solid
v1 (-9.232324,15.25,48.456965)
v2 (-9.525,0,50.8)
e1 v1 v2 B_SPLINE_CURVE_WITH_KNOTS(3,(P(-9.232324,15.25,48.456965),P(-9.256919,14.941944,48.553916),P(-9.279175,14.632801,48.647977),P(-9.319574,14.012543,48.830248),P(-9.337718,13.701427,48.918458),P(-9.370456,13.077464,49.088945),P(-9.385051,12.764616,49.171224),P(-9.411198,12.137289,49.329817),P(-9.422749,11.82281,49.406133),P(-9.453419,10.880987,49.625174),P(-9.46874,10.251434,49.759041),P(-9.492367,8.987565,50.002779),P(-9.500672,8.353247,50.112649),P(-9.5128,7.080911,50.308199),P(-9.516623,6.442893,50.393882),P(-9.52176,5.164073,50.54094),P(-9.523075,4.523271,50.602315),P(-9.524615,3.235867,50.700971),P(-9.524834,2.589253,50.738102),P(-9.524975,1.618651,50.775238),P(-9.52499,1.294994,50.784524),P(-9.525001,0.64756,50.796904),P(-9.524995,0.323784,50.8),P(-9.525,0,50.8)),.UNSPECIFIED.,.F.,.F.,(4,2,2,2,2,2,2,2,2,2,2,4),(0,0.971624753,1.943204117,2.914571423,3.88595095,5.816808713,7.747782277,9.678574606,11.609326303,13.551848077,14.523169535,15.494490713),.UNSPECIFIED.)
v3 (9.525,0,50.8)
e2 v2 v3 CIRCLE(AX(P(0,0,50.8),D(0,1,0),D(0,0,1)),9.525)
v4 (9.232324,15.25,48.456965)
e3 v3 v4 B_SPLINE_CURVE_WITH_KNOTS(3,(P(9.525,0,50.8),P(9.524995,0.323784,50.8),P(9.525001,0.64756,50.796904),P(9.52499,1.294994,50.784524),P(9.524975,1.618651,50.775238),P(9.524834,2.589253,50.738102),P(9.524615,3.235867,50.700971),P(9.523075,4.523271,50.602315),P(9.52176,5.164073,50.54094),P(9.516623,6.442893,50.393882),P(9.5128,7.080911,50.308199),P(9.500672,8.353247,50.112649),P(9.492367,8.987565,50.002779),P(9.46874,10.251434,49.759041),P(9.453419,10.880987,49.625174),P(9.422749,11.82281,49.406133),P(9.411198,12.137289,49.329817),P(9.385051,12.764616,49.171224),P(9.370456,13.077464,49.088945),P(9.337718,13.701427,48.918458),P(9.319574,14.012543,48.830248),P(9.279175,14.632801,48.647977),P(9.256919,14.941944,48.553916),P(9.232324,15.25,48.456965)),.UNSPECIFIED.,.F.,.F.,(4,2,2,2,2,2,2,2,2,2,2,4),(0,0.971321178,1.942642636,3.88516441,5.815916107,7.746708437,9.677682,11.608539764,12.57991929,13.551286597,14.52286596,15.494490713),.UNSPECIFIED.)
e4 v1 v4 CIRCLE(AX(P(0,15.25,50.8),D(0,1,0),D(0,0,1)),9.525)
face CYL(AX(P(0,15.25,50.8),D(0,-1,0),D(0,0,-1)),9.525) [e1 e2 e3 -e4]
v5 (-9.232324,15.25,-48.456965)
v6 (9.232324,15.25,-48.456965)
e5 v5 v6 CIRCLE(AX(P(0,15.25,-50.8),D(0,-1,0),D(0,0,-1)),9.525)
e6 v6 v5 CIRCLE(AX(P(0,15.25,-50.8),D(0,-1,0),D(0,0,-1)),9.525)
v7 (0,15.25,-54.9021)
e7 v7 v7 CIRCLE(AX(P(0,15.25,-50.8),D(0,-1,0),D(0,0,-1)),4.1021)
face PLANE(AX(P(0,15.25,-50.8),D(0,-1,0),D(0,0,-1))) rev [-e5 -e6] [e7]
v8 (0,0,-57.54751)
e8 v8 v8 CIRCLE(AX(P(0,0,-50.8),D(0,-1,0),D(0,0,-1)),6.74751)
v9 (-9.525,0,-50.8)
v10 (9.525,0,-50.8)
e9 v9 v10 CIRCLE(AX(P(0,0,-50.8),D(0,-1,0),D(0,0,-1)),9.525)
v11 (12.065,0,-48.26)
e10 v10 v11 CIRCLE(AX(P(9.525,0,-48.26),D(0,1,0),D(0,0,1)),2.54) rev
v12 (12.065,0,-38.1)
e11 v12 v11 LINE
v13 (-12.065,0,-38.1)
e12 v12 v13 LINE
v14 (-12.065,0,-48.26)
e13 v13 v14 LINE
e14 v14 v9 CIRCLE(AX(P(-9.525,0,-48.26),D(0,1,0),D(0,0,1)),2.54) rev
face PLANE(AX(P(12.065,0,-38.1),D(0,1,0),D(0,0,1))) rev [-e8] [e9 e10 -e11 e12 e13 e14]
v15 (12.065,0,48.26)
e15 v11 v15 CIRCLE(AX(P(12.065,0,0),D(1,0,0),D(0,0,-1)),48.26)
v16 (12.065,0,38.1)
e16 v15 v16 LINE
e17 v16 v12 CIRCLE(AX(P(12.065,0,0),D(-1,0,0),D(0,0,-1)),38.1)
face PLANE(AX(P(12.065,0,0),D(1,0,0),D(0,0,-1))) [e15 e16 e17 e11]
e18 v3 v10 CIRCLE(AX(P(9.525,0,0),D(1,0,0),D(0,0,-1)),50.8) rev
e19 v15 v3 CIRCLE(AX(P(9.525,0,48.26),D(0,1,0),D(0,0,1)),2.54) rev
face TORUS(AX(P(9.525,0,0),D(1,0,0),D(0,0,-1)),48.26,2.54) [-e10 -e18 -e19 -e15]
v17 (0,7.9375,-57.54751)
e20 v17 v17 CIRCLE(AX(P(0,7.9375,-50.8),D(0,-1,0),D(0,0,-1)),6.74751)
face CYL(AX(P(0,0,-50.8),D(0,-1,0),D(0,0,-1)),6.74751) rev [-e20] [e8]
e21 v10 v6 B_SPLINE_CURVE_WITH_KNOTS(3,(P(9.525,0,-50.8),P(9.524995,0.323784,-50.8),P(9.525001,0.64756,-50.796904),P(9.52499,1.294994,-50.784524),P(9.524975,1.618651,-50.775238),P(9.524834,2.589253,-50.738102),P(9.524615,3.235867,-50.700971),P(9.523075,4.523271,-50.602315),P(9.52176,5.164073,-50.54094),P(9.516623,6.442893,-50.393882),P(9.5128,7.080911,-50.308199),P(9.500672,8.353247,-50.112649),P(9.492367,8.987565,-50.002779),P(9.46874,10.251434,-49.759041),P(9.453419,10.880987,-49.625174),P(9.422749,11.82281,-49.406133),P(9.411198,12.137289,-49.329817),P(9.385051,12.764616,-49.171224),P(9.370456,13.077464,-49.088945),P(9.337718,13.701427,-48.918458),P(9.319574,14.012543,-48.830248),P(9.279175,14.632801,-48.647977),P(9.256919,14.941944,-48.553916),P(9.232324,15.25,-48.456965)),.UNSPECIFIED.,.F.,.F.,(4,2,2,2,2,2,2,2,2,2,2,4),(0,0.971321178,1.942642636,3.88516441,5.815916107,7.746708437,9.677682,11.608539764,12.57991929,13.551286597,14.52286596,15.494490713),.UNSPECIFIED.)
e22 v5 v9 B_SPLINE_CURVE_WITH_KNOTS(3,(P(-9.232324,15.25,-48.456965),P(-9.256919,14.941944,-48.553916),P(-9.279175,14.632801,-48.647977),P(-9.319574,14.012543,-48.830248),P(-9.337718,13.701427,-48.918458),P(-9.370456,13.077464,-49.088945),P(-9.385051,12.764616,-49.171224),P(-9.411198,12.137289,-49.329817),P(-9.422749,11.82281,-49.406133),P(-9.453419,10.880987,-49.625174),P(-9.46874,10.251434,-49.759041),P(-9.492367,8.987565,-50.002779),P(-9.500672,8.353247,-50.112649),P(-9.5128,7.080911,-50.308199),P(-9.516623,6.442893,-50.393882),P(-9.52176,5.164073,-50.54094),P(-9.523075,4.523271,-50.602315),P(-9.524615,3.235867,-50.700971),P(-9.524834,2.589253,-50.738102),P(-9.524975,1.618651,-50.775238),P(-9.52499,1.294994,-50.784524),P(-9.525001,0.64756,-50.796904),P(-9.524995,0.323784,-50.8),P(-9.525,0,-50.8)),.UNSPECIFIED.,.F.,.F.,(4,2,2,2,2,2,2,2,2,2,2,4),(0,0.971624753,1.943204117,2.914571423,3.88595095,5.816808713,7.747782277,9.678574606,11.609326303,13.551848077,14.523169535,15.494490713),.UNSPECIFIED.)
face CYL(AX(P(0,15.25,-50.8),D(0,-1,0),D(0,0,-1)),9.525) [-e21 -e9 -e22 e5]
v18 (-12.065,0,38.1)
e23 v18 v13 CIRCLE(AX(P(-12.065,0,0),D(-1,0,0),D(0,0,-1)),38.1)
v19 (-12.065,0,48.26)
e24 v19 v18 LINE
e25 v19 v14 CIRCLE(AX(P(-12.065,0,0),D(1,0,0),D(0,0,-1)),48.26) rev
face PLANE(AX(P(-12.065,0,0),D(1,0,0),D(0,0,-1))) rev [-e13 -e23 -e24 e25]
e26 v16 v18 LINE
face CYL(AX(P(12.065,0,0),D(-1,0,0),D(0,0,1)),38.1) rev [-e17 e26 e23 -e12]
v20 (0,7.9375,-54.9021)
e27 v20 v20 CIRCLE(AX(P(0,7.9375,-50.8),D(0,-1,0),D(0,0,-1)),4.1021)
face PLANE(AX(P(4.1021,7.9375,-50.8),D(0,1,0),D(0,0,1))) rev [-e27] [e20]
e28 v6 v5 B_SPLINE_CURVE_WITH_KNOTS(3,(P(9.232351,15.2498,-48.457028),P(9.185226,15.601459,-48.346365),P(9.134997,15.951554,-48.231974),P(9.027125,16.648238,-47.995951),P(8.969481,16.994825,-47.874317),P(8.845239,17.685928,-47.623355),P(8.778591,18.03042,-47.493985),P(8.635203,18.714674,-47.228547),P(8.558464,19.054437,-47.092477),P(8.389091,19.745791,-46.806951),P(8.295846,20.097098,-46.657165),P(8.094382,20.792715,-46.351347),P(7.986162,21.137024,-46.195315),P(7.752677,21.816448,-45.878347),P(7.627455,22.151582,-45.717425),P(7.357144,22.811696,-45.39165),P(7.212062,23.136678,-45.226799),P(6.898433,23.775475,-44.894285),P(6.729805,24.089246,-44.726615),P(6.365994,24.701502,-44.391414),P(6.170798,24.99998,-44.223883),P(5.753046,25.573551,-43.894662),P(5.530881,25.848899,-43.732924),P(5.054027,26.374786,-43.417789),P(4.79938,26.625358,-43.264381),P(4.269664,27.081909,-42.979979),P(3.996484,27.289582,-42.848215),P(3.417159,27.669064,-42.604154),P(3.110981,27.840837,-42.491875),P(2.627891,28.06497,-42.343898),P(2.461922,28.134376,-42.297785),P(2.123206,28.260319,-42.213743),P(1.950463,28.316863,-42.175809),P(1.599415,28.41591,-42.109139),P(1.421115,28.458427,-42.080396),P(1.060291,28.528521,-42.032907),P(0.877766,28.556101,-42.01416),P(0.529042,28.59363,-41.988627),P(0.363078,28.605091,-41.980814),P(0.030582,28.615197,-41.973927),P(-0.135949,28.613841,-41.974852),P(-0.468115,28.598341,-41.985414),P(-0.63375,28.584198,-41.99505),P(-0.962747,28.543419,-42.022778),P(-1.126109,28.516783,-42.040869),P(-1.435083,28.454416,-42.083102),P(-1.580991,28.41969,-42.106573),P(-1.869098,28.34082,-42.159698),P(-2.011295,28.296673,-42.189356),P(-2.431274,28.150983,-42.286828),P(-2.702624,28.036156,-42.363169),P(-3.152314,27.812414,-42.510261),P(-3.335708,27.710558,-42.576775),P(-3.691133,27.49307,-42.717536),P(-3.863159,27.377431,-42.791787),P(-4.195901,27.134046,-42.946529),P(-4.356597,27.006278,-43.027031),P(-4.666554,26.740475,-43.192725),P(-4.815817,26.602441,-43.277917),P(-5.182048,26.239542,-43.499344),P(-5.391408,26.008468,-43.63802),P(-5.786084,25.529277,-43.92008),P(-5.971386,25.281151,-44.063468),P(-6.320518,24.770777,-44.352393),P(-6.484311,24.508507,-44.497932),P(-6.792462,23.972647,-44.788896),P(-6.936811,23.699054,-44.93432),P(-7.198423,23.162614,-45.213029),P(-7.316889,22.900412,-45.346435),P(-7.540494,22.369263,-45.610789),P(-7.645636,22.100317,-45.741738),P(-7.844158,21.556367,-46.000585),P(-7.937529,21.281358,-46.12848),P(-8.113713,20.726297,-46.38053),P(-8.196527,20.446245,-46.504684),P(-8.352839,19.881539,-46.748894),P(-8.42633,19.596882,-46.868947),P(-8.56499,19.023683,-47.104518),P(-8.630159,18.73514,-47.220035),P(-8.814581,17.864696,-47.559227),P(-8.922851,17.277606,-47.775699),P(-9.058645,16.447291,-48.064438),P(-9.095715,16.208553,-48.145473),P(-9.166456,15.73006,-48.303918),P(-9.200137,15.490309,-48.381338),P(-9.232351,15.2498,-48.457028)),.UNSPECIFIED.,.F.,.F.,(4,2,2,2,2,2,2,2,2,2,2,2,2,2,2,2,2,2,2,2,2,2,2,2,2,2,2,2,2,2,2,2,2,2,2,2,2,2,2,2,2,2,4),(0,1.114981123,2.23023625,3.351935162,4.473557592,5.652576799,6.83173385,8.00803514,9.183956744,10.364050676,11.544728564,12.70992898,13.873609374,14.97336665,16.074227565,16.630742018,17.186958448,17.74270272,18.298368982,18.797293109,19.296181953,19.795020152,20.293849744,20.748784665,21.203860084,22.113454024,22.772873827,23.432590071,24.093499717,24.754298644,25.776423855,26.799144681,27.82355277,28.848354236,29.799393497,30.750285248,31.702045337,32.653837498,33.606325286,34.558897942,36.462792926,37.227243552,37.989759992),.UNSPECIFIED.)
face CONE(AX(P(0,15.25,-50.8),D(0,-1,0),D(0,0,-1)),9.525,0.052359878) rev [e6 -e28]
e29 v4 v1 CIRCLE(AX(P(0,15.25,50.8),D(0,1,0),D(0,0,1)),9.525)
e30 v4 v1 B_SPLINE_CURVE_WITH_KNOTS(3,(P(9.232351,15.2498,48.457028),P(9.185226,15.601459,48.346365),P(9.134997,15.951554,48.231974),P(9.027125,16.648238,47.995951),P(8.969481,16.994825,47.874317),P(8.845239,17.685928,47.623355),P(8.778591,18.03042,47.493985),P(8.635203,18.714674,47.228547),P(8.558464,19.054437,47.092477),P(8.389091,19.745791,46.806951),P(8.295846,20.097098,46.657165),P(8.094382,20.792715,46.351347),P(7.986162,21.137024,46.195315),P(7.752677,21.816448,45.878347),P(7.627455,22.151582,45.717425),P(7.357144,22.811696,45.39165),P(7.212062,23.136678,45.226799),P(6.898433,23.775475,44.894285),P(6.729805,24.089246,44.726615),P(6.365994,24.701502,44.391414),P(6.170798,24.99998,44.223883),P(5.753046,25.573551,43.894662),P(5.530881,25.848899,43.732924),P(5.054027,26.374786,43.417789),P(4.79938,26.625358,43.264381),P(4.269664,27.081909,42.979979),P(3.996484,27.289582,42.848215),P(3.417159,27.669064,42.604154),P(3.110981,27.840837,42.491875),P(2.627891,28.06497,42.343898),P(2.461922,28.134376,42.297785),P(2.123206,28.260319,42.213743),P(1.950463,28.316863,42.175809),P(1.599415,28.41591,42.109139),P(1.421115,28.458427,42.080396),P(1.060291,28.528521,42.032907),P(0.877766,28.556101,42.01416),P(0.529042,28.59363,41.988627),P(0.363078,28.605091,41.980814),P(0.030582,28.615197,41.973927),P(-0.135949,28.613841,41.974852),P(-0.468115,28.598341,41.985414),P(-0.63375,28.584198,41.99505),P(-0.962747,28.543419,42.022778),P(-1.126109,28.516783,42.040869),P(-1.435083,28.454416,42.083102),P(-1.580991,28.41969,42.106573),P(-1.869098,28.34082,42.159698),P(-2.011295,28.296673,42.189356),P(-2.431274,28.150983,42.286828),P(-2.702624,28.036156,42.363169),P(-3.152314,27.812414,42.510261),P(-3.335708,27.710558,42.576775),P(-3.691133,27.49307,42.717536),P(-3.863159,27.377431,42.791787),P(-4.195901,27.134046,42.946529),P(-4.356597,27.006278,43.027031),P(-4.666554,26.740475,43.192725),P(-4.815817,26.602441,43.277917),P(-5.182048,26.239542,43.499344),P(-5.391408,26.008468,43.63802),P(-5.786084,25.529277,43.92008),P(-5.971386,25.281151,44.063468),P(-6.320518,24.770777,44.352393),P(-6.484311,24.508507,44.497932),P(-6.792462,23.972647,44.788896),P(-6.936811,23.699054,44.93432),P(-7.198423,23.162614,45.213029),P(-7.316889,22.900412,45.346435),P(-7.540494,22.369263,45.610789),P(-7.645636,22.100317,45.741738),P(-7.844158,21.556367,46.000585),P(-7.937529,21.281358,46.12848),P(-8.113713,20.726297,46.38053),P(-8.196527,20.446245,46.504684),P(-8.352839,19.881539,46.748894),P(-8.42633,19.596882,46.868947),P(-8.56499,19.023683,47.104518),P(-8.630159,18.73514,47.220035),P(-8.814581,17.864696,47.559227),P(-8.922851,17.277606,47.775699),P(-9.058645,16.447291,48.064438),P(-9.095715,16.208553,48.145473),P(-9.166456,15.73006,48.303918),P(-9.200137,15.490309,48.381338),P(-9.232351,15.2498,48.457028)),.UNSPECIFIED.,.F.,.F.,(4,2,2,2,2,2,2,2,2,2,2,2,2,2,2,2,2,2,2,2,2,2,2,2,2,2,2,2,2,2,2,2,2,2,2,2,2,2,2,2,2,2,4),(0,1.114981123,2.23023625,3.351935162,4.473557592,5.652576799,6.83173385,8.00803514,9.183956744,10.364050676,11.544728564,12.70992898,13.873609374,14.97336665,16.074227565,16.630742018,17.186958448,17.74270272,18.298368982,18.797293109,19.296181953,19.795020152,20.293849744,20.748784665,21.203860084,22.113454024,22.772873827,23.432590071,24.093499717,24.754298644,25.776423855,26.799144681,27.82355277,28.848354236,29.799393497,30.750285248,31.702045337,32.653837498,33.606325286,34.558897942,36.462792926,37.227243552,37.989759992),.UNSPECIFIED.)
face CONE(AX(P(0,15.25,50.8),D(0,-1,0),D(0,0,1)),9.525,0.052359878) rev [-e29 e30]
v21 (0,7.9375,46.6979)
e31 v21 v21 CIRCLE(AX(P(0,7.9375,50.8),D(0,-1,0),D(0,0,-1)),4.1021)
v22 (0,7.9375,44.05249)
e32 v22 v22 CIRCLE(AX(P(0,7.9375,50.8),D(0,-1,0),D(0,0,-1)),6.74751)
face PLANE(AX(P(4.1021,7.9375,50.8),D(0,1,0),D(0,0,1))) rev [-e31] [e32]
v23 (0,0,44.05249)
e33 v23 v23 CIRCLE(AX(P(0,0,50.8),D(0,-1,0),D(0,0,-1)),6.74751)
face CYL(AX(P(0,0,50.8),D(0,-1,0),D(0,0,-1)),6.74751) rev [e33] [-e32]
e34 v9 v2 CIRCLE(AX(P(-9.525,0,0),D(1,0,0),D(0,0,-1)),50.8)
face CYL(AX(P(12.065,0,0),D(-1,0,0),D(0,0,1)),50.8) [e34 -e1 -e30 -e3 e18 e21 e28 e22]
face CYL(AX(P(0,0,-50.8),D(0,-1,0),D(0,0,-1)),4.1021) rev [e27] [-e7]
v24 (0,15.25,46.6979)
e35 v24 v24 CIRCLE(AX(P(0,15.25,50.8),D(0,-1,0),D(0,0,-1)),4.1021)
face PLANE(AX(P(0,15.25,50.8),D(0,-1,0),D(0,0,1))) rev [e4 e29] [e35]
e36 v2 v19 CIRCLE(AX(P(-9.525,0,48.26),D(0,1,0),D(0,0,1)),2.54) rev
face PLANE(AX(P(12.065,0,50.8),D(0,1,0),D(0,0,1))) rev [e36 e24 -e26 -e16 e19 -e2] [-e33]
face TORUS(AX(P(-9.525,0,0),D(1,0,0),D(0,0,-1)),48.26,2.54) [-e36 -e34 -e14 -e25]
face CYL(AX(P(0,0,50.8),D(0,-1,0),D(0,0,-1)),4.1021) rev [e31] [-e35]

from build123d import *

# Parameters (mm, degrees)
BOSS_EXTRUDE1_DEPTH                               = 12.065
SKETCH2_R                                         = 9.525
BOSS_EXTRUDE2_DEPTH                               = 15.25
CUT_EXTRUDE1_START                                = -15.25
SKETCH2_2_R                                       = 9.525
CUT_EXTRUDE1_DEPTH                                = 15.25
CUT_EXTRUDE1_DRAFT                                = -3
CBORE_FOR_5_16_SOCKET_HEAD_CAP_SCREW1_D           = 8.2042
CBORE_FOR_5_16_SOCKET_HEAD_CAP_SCREW1_CBORE_D     = 13.49502
CBORE_FOR_5_16_SOCKET_HEAD_CAP_SCREW1_CBORE_DEPTH = 7.9375
MIRROR2_START                                     = -15.25
MIRROR2_COPY_1_SKETCH_R                           = 9.525
MIRROR2_COPY_1_DEPTH                              = 15.25
MIRROR2_COPY_1_DRAFT                              = -3
FILLET1_R                                         = 2.54


with BuildPart() as part:
    # Sketch1 → Boss-Extrude1 (new, symmetric)
    with BuildSketch(Plane(origin=(0, 0, 0), x_dir=(0, 0, -1), z_dir=(1, 0, 0))):
        with BuildLine():
            Line((-50.8, 0), (-38.1, 0))
            ThreePointArc((-38.1, 0), (0, 38.1), (38.1, 0))
            Line((38.1, 0), (50.8, 0))
            ThreePointArc((50.8, 0), (0, 50.8), (-50.8, 0))
        make_face()
    extrude(amount=BOSS_EXTRUDE1_DEPTH, both=True)

    # Sketch2 → Boss-Extrude2 (add)
    with BuildSketch(Plane.XZ):
        with Locations((0, -50.8)):
            Circle(SKETCH2_R)
    boss_extrude2 = extrude(amount=-BOSS_EXTRUDE2_DEPTH)


with BuildPart() as cut_extrude1_tool:
    # Sketch2<2> → Cut-Extrude1 (with draft: the straight prism first)
    with BuildSketch(Plane.XZ.offset(CUT_EXTRUDE1_START)):
        with Locations((0, -50.8)):
            Circle(SKETCH2_2_R)
    extrude(amount=-CUT_EXTRUDE1_DEPTH)
    # Cut-Extrude1: the draft: its side faces are tilted about the plane it starts from
    cut_extrude1_sides = [cut_extrude1_tool.faces().sort_by_distance(p)[0] for p in [
        (-9.525, 22.875, -50.8),
    ]]
    draft(cut_extrude1_sides, Plane.XZ.offset(CUT_EXTRUDE1_START), CUT_EXTRUDE1_DRAFT)


with BuildPart() as part_1:
    add(part.part)

    # Cut-Extrude1: cut by cut_extrude1_tool
    add(cut_extrude1_tool.part, mode=Mode.SUBTRACT)

    # CBORE for 5/16 Socket Head Cap Screw1 (through all)
    with Locations(Plane(origin=(0, 0, 0), x_dir=(-1, 0, 0), z_dir=(0, -1, 0))):
        with Locations((0, 50.8)):
            cbore_for_5_16_socket_head_cap_screw1 = CounterBoreHole(CBORE_FOR_5_16_SOCKET_HEAD_CAP_SCREW1_D / 2, CBORE_FOR_5_16_SOCKET_HEAD_CAP_SCREW1_CBORE_D / 2, CBORE_FOR_5_16_SOCKET_HEAD_CAP_SCREW1_CBORE_DEPTH)

    # Mirror1: Boss-Extrude2, CBORE for 5/16 Socket Head Cap Screw1 across plane
    add(boss_extrude2.mirror(Plane.XY))
    add(cbore_for_5_16_socket_head_cap_screw1.mirror(Plane.XY), mode=Mode.SUBTRACT)


with BuildPart() as mirror2_copy_1_tool:
    # Mirror2 copy 1 sketch → Mirror2 copy 1 (with draft: the straight prism first)
    with BuildSketch(Plane.XZ.offset(MIRROR2_START)):
        with Locations((0, 50.8)):
            Circle(MIRROR2_COPY_1_SKETCH_R)
    extrude(amount=-MIRROR2_COPY_1_DEPTH)
    # Mirror2 copy 1: the draft: its side faces are tilted about the plane it starts from
    mirror2_copy_1_sides = [mirror2_copy_1_tool.faces().sort_by_distance(p)[0] for p in [
        (-9.525, 22.875, 50.8),
    ]]
    draft(mirror2_copy_1_sides, Plane.XZ.offset(MIRROR2_START), MIRROR2_COPY_1_DRAFT)


with BuildPart() as part_2:
    add(part_1.part)

    # Mirror2 copy 1: cut by mirror2_copy_1_tool
    add(mirror2_copy_1_tool.part, mode=Mode.SUBTRACT)

    # Fillet1
    fillet1_edges = [part_2.edges().sort_by_distance(p)[0] for p in [
        (12.065, 50.8, 0),
        (-12.065, 50.8, 0),
    ]]
    fillet(fillet1_edges, radius=FILLET1_R - 0.0001)  # a hair under: the kernel refuses the full size


solid = part_2.part
